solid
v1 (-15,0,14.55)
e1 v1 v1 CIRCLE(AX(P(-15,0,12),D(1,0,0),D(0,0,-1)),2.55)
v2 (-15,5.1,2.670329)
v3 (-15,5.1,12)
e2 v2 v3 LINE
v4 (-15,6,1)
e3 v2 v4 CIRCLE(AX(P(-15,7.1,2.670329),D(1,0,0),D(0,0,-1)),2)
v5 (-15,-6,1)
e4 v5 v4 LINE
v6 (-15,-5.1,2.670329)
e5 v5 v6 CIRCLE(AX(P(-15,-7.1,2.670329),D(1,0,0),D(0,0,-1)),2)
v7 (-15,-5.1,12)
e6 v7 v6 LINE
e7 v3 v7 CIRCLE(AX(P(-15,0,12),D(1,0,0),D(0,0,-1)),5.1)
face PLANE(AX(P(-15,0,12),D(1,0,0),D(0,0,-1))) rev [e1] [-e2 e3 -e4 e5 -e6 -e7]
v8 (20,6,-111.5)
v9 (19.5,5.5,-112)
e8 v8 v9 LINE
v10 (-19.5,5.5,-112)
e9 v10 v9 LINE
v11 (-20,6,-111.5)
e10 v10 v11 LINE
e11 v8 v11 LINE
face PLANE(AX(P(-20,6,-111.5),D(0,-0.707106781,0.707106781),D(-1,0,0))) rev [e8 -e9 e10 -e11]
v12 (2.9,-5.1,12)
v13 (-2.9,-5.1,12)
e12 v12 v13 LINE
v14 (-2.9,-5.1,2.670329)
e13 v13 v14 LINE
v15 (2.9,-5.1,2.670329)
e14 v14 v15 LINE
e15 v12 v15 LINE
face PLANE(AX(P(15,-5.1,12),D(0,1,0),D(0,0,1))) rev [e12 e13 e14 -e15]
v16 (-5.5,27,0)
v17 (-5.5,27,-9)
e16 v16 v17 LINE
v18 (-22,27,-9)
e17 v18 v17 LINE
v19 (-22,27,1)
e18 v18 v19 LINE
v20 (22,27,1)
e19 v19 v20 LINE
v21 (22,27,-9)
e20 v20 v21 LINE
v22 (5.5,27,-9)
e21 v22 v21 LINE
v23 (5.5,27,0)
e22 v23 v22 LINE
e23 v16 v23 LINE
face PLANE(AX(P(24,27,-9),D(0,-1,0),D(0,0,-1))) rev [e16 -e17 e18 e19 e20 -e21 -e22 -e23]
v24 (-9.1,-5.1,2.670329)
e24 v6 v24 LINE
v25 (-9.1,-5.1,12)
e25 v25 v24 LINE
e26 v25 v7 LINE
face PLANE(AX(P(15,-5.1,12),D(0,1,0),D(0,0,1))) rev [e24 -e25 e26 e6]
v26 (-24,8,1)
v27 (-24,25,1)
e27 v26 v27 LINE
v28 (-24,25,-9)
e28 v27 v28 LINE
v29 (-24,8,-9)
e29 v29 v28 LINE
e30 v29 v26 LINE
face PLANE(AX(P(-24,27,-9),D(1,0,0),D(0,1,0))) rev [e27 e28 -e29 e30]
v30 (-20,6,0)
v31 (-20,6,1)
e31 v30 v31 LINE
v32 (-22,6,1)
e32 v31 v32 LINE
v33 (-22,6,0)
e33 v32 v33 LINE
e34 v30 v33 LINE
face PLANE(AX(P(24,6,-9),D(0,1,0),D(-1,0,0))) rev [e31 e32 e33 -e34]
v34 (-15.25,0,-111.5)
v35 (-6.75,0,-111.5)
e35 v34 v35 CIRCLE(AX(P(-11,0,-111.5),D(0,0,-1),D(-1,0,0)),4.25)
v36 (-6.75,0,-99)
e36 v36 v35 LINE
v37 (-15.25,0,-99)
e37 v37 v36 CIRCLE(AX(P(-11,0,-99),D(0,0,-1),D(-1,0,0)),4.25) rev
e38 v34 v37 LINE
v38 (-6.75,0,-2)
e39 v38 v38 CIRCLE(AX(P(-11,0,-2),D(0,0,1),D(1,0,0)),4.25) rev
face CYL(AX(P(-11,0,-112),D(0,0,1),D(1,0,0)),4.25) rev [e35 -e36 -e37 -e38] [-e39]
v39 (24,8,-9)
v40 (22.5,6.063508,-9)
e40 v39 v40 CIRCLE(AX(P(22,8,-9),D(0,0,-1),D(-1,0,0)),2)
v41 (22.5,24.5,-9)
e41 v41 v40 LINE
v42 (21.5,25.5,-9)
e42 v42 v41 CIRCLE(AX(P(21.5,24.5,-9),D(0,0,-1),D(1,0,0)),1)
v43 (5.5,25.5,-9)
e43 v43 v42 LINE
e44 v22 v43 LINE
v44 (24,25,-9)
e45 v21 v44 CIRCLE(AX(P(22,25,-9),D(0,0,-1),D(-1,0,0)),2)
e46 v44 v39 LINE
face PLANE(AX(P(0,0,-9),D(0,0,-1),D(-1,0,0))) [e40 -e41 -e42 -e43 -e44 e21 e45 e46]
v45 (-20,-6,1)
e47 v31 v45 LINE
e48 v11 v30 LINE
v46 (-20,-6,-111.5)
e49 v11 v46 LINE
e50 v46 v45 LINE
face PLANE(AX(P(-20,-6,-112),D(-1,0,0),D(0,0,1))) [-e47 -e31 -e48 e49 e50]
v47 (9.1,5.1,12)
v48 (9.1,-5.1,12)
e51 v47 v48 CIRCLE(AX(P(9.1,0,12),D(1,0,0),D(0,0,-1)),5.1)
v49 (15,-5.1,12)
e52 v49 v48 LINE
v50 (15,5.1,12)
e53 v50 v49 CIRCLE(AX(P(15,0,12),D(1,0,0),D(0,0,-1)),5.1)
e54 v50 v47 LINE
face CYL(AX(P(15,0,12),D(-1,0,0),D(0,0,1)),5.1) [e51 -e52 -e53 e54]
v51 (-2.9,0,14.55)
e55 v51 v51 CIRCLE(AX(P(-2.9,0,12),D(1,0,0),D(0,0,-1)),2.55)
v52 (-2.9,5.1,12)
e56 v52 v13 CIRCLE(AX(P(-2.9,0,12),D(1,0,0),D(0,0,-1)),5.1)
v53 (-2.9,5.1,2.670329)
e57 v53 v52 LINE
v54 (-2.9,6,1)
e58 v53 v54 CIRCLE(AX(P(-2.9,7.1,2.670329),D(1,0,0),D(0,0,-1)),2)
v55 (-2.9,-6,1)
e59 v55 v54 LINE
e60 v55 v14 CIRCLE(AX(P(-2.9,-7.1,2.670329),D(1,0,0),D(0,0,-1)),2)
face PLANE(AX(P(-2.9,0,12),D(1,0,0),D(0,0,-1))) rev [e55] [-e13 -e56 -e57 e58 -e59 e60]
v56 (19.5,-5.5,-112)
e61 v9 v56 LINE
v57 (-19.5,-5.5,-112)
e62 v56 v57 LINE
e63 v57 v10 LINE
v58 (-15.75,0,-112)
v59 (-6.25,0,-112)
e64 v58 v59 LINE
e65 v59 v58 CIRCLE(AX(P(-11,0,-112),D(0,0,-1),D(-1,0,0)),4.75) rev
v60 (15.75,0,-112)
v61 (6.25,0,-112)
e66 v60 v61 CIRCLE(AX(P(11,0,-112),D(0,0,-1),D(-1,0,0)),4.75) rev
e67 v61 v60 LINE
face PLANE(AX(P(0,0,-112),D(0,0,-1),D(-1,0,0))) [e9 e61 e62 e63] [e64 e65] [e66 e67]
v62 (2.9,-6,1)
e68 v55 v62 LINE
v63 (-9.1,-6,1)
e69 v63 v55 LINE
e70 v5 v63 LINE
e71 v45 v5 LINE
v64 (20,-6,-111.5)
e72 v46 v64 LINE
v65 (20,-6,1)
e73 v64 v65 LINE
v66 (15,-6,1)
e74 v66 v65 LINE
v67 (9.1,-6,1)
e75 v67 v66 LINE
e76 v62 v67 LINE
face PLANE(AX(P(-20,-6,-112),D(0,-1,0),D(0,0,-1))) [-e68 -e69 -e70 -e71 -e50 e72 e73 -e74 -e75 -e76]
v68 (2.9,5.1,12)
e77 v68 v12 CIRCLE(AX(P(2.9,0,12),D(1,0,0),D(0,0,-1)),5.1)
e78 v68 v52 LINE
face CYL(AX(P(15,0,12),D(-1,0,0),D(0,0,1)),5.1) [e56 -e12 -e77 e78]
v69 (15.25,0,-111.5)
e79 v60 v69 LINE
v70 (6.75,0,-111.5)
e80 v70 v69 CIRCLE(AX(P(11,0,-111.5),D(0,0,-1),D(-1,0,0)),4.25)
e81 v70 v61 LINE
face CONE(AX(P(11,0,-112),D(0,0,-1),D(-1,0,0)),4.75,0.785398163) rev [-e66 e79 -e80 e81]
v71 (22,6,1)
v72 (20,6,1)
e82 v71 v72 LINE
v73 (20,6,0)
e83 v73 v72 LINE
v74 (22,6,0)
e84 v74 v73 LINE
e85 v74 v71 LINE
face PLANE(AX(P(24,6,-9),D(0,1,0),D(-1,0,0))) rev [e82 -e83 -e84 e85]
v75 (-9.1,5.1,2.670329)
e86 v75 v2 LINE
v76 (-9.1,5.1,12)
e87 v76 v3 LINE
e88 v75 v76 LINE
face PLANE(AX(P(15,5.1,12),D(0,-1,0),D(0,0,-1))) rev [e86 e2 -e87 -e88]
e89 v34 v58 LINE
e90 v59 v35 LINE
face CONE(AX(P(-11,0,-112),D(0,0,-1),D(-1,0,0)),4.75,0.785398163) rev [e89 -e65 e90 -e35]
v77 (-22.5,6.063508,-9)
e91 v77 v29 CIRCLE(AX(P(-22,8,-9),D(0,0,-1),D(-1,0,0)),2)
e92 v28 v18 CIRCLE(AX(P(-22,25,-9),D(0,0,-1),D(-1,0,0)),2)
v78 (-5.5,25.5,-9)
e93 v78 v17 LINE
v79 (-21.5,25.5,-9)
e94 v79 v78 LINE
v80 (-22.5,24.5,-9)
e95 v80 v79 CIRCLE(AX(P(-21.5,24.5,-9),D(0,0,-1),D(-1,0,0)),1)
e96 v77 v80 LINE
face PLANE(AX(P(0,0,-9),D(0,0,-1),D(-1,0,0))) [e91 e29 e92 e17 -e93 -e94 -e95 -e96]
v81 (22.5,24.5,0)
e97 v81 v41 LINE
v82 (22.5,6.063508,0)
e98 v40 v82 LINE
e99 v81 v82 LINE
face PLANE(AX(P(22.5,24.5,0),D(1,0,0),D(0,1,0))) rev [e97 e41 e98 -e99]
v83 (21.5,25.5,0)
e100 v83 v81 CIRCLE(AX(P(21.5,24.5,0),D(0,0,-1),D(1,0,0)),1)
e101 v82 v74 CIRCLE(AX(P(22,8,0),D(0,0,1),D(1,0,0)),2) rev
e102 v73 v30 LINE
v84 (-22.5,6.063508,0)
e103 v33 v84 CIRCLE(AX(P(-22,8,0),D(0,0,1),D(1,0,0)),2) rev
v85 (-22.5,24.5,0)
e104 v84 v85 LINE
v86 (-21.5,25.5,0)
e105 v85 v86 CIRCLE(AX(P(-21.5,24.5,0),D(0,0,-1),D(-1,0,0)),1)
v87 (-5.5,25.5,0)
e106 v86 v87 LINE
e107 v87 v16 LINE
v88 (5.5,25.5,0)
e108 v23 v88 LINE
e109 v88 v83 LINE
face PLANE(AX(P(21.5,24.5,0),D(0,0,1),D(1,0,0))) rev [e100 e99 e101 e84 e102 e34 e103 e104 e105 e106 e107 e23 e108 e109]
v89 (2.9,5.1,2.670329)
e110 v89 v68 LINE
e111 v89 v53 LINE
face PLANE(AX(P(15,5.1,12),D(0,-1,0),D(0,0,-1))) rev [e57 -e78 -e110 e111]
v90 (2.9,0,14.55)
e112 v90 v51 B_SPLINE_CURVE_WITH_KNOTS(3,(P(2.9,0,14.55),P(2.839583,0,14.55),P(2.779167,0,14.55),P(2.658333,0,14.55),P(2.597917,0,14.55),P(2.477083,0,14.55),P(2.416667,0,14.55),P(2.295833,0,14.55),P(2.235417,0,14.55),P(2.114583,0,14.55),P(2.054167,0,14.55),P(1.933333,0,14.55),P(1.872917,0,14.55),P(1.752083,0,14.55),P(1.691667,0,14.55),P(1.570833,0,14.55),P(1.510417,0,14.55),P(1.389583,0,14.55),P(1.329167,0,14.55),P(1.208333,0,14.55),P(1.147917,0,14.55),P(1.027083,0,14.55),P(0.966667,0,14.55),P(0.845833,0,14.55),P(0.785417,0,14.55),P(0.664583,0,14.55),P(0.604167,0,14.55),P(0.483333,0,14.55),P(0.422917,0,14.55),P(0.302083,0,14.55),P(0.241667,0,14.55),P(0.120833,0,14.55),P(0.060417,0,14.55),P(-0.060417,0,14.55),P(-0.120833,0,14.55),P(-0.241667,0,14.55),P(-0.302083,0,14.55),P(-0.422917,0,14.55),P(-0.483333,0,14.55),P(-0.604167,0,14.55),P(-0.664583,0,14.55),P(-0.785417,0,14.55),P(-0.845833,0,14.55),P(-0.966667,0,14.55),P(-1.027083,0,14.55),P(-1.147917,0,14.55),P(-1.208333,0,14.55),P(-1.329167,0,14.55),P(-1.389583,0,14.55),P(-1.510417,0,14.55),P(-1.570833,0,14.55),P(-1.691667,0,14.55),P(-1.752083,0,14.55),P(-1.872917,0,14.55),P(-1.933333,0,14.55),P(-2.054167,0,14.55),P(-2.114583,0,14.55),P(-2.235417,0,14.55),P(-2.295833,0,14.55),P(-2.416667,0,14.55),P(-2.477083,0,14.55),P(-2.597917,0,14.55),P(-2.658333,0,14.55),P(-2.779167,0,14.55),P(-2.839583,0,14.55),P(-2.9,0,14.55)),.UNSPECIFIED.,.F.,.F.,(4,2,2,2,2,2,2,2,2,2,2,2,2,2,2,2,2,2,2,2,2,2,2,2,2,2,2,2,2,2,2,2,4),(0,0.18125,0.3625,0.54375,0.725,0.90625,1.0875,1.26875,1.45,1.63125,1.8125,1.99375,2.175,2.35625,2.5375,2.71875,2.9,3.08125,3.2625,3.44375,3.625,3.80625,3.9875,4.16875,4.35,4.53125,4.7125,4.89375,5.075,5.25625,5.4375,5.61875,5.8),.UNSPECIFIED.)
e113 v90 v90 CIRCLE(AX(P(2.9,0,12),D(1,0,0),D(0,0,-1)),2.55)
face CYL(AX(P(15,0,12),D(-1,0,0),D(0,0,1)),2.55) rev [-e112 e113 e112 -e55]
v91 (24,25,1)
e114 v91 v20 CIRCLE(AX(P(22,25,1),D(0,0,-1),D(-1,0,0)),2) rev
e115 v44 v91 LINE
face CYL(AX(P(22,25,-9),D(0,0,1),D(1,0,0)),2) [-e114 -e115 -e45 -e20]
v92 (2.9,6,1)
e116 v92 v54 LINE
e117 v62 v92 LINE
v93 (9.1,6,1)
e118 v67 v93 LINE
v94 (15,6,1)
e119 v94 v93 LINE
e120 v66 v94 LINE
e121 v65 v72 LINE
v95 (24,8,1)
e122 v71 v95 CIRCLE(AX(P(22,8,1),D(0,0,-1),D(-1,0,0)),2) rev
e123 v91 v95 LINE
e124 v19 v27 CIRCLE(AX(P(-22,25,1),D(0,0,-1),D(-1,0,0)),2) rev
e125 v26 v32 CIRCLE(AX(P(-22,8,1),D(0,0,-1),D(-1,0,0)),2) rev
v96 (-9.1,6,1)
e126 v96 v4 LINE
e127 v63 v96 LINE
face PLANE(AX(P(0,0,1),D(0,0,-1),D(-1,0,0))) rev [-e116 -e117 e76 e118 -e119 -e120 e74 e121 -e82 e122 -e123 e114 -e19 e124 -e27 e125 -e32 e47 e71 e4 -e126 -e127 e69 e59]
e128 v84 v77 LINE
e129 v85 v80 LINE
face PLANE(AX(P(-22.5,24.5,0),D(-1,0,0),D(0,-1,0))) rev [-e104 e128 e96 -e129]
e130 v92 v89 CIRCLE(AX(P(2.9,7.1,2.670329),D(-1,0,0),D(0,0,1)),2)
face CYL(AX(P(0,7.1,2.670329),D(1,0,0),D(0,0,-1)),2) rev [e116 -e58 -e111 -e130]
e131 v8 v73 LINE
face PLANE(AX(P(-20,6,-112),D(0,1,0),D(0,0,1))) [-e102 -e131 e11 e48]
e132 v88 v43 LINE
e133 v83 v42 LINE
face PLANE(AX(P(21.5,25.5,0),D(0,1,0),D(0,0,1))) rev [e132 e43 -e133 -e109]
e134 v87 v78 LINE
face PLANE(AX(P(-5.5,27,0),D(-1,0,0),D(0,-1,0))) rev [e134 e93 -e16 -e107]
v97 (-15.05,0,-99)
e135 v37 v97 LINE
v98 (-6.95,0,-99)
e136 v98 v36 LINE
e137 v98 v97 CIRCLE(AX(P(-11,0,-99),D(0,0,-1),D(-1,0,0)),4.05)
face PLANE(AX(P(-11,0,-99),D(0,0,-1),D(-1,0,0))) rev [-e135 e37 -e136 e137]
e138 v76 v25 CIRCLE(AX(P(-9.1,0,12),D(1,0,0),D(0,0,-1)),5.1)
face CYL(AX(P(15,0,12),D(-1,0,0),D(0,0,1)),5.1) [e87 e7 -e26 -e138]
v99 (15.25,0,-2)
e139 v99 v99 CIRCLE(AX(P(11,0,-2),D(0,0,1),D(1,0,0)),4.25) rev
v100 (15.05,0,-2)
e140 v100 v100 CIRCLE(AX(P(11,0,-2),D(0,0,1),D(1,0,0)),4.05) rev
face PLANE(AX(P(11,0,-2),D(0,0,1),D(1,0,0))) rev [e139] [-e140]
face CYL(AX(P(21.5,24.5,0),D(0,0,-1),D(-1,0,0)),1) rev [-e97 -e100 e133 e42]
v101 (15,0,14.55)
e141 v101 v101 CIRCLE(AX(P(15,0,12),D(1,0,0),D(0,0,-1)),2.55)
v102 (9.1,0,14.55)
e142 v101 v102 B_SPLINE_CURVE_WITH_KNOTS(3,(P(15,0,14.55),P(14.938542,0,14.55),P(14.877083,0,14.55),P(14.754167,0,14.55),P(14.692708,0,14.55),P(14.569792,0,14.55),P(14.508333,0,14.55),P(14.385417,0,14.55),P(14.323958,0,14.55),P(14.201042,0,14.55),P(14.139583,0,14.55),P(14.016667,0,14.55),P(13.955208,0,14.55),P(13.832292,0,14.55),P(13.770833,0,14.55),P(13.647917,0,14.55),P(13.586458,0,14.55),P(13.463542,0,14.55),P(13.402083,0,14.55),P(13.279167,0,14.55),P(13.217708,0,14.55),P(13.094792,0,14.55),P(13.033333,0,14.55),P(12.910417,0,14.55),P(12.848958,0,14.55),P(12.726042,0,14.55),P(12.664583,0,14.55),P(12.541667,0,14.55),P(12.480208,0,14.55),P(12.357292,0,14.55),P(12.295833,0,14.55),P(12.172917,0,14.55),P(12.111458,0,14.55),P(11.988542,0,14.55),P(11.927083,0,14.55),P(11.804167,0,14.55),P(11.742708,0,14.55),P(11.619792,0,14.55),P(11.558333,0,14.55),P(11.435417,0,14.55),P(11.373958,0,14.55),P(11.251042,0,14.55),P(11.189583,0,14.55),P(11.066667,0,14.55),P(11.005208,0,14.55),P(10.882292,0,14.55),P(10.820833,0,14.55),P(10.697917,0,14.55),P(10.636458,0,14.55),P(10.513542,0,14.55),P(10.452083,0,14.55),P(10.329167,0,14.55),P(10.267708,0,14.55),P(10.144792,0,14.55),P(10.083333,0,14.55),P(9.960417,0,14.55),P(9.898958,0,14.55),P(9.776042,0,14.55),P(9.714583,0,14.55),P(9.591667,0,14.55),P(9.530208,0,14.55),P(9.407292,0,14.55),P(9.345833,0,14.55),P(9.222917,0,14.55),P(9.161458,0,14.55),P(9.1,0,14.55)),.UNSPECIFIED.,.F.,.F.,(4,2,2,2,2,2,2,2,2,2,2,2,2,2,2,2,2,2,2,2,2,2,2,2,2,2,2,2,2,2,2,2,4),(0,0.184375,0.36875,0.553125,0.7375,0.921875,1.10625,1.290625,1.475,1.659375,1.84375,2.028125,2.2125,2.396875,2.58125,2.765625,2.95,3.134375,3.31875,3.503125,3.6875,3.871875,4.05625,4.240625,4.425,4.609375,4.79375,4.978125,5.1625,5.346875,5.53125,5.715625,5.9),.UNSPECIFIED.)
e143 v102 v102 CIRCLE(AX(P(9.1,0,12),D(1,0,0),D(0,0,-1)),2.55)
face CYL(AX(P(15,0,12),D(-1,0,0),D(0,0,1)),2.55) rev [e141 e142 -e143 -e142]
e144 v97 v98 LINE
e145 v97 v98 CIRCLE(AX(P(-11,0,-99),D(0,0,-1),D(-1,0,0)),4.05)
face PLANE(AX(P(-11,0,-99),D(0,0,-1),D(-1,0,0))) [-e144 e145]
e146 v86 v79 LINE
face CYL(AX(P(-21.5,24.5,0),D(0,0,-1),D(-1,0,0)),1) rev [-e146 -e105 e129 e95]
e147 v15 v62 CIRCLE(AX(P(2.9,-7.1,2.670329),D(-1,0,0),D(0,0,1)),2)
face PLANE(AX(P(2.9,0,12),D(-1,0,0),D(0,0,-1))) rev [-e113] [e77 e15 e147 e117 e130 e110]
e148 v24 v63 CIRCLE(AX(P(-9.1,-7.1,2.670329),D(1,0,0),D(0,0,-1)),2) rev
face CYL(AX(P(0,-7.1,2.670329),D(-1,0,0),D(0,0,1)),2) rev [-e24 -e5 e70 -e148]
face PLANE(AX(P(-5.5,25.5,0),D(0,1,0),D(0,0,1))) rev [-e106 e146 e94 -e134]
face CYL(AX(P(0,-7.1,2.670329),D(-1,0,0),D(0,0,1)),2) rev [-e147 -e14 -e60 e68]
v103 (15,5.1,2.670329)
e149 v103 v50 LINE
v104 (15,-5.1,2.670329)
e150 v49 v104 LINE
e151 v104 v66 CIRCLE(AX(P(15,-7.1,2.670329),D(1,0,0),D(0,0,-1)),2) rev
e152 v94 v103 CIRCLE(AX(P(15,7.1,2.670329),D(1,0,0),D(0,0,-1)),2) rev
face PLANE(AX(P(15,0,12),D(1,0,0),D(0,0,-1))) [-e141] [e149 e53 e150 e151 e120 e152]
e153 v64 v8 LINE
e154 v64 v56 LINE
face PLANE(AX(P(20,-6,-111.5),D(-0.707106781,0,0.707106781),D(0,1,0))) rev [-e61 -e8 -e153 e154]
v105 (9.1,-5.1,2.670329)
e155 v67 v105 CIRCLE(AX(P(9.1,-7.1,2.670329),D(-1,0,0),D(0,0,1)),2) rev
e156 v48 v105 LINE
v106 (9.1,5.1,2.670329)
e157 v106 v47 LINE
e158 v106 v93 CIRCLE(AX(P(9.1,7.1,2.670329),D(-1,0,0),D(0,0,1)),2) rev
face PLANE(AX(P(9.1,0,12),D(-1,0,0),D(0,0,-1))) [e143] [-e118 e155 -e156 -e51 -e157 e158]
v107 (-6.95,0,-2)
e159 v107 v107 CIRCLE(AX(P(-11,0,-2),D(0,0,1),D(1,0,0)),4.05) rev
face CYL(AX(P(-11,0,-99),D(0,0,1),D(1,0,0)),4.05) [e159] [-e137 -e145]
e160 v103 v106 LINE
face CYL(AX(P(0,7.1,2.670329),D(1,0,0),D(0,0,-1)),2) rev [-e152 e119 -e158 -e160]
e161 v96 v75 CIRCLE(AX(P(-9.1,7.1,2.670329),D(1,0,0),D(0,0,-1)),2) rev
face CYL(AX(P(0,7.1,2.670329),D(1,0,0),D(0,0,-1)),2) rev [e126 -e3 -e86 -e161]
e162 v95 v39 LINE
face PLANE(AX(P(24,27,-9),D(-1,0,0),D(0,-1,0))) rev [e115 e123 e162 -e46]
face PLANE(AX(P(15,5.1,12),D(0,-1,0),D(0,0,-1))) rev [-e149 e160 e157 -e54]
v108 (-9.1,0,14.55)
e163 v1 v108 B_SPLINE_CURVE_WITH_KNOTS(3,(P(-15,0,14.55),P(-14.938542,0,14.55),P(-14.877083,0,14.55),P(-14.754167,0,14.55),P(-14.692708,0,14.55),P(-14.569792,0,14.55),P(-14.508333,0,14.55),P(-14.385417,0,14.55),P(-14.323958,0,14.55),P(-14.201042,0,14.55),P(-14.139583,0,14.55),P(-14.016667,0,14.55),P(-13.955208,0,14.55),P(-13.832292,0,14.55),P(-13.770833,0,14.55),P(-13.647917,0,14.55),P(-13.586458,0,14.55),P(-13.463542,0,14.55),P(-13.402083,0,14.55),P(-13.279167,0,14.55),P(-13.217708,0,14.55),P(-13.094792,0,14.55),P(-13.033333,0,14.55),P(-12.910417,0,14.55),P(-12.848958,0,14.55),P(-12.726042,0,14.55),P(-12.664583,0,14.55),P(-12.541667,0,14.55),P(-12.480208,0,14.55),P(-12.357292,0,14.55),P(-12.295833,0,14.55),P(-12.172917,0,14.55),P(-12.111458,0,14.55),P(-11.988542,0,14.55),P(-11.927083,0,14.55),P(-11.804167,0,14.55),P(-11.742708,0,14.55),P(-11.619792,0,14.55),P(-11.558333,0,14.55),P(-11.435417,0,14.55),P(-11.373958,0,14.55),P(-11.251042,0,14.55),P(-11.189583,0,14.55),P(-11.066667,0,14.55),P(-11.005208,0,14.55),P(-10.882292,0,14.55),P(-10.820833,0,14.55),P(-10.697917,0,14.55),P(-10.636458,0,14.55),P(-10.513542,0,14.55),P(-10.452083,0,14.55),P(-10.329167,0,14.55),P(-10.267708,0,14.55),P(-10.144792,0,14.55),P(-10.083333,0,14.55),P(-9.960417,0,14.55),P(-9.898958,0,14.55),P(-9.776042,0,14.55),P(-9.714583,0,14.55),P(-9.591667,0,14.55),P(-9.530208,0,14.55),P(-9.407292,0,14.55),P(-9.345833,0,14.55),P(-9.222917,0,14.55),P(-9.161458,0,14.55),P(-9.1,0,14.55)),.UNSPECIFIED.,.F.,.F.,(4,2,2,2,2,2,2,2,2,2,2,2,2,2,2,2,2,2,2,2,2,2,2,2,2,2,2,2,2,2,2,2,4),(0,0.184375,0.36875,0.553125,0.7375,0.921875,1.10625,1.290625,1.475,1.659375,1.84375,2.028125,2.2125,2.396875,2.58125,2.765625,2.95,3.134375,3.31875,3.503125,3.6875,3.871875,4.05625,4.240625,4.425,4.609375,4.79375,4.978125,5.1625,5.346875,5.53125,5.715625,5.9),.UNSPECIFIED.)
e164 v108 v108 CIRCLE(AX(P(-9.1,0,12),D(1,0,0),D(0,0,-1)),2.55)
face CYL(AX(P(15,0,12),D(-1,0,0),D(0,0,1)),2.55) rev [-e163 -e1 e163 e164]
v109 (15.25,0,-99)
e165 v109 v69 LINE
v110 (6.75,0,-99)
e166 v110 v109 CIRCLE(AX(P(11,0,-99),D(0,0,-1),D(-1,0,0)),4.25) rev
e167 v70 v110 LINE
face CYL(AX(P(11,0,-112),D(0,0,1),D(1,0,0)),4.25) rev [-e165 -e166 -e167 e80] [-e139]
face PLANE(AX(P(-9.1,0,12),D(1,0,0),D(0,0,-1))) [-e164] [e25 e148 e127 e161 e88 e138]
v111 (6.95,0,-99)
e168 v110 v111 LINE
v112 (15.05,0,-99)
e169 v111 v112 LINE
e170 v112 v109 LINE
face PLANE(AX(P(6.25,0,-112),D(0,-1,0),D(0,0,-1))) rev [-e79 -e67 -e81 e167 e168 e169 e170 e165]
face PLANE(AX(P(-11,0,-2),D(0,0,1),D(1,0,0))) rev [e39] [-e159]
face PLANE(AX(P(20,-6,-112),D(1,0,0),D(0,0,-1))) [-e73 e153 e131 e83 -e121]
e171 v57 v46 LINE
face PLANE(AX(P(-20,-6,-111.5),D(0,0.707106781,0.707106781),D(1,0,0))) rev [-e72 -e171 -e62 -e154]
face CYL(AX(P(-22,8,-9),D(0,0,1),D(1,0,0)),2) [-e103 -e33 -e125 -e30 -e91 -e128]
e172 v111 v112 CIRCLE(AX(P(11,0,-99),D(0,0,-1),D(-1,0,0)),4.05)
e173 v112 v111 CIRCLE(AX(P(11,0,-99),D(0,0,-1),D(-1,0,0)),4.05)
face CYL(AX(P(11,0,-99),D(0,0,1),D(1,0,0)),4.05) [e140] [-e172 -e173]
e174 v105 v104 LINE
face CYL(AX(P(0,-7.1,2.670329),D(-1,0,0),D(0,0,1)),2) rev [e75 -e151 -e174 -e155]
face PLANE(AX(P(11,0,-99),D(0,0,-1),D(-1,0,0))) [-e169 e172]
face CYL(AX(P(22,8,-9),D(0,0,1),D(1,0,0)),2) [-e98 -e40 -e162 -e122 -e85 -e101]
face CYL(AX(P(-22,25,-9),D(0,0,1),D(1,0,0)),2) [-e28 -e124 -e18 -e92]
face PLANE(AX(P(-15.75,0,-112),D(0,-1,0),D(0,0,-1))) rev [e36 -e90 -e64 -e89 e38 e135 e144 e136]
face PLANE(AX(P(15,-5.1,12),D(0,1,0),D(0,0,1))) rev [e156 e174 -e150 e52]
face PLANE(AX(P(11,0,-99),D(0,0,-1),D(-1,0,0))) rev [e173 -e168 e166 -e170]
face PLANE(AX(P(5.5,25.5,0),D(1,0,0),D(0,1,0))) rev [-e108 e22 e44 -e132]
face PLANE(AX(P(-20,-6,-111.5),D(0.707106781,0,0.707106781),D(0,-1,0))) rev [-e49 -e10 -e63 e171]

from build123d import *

# Parameters (mm, degrees)
BOSS_EXTRUDE1_DEPTH      = 1
BOSS_EXTRUDE1_DEPTH_BACK = 112
SKETCH1_W                = 40
SKETCH1_H                = 12
SKETCH1_R                = 4.25
SKETCH3_R                = 2.55
BOSS_EXTRUDE2_DEPTH      = 15
CUT_EXTRUDE1_START       = -2.9
SKETCH3_2_R              = 2.55
CUT_EXTRUDE1_DEPTH       = 6.2
BOSS_EXTRUDE3_START      = -3
SKETCH5_R                = 4.25
BOSS_EXTRUDE3_DEPTH      = 3
CHAMFER3_SIZE            = 0.5
FILLET3_R                = 2
SKETCH12_R               = 4.05
BOSS_EXTRUDE9_DEPTH      = 100
SKETCH18_W               = 48
SKETCH18_H               = 21
BOSS_EXTRUDE11_DEPTH     = 10
FILLET10_R               = 2
CUT_EXTRUDE8_DEPTH       = 9
BOSS_EXTRUDE12_DEPTH     = 13


with BuildPart() as part:
    # Sketch1 → Boss-Extrude1 (new, two sides: drawn at the far end of the back side and taken through both)
    with BuildSketch(Plane.XY.offset(-BOSS_EXTRUDE1_DEPTH_BACK)):
        Rectangle(SKETCH1_W, SKETCH1_H)
        with Locations((11, 0)):
            Circle(SKETCH1_R, mode=Mode.SUBTRACT)
        with Locations(Location((-11, 0, 0), (0, 0, 180))):
            Circle(SKETCH1_R, mode=Mode.SUBTRACT)
    extrude(amount=BOSS_EXTRUDE1_DEPTH + BOSS_EXTRUDE1_DEPTH_BACK)

    # Sketch3 → Boss-Extrude2 (add, symmetric)
    with BuildSketch(Plane(origin=(0, 0, 0), x_dir=(0, 0, -1), z_dir=(1, 0, 0))):
        with BuildLine():
            Line((-12, -5.1), (-1, -5.1))
            Line((-1, -5.1), (-1, 5.1))
            Line((-1, 5.1), (-12, 5.1))
            ThreePointArc((-12, 5.1), (-17.1, 0), (-12, -5.1))
        make_face()
        with Locations((-12, 0)):
            Circle(SKETCH3_R, mode=Mode.SUBTRACT)
    extrude(amount=BOSS_EXTRUDE2_DEPTH, both=True)

    # Sketch3<2> → Cut-Extrude1 (cut)
    with BuildSketch(Plane(origin=(0, 0, 0), x_dir=(0, 0, -1), z_dir=(1, 0, 0)).offset(CUT_EXTRUDE1_START)):
        with BuildLine():
            Line((-12, -5.1), (-1, -5.1))
            Line((-1, -5.1), (-1, 5.1))
            Line((-1, 5.1), (-12, 5.1))
            ThreePointArc((-12, 5.1), (-17.1, 0), (-12, -5.1))
        make_face()
        with Locations((-12, 0)):
            Circle(SKETCH3_2_R, mode=Mode.SUBTRACT)
    cut_extrude1 = extrude(amount=-CUT_EXTRUDE1_DEPTH, mode=Mode.SUBTRACT)

    # Mirror1: Cut-Extrude1 across plane
    add(cut_extrude1.mirror(Plane(origin=(0, 0, 0), x_dir=(0, 0, 1), z_dir=(1, 0, 0))), mode=Mode.SUBTRACT)

    # Sketch5 → Boss-Extrude3 (add)
    with BuildSketch(Plane.XY.offset(1).offset(BOSS_EXTRUDE3_START)):
        with Locations((-11, 0)):
            Circle(SKETCH5_R)
        with Locations((11, 0)):
            Circle(SKETCH5_R)
    extrude(amount=BOSS_EXTRUDE3_DEPTH)

    # Chamfer3
    chamfer3_edges = [part.edges().sort_by_distance(p)[0] for p in [
        (6.75, 0, -112),
        (-20, 0, -112),
        (-6.75, 0, -112),
        (0, -6, -112),
        (20, 0, -112),
        (0, 6, -112),
    ]]
    chamfer(chamfer3_edges, length=CHAMFER3_SIZE)

    # Fillet3
    # the kernel refuses this fillet: 2 mm, written as the material it adds along each edge
    with BuildSketch(Plane(origin=(9.1, -5.1, 1), x_dir=(0, -1.0, 1.5367953823073576e-12), z_dir=(1, 0, 0)), Plane(origin=(-15, -5.1, 1), x_dir=(0, -1.0, 1.5367953823073576e-12), z_dir=(1, 0, 0))) as fillet3_piece_1:
        with BuildLine():
            CenterArc((2, -1.670329309), FILLET3_R, 123.367012969, 56.632987031)
            Line((0, -1.670329309), (-0.04, -1.670329309))
            Line((-0.04, -1.670329309), (-0.04, 0))
            Line((-0.04, 0), (0, 0.04))
            ThreePointArc((0, 0.04), (0.45, 0.04), (0.878, 0.033406586))
            Line((0.878, 0.033406586), (0.9, 0))
        make_face()
    extrude(amount=5.9)
    with BuildSketch(Plane(origin=(9.1, 5.1, 1), x_dir=(0, 1.0, 1.5343282200304168e-12), z_dir=(1, 0, 0)), Plane(origin=(-15, 5.1, 1), x_dir=(0, 1.0, 1.5340815038027225e-12), z_dir=(1, 0, 0))) as fillet3_piece_2:
        with BuildLine():
            CenterArc((2, 1.670329309), FILLET3_R, 180, 56.632987031)
            Line((0, 1.670329309), (-0.04, 1.670329309))
            Line((-0.04, 1.670329309), (-0.04, 0))
            Line((-0.04, 0), (0, -0.04))
            ThreePointArc((0, -0.04), (0.45, -0.04), (0.878, -0.033406586))
            Line((0.878, -0.033406586), (0.9, 0))
        make_face()
    extrude(amount=5.9)
    with BuildSketch(Plane(origin=(-2.9, 5.1, 1), x_dir=(0, 1.0, 1.5343282200304168e-12), z_dir=(1, 0, 0))) as fillet3_piece_3:
        with BuildLine():
            CenterArc((2, 1.670329309), FILLET3_R, 180, 56.632987031)
            Line((0, 1.670329309), (-0.04, 1.670329309))
            Line((-0.04, 1.670329309), (-0.04, 0))
            Line((-0.04, 0), (0, -0.04))
            ThreePointArc((0, -0.04), (0.45, -0.04), (0.878, -0.033406586))
            Line((0.878, -0.033406586), (0.9, 0))
        make_face()
    extrude(amount=5.8)
    with BuildSketch(Plane(origin=(-2.9, -5.1, 1), x_dir=(0, -1.0, 1.5367953823073576e-12), z_dir=(1, 0, 0))) as fillet3_piece_4:
        with BuildLine():
            CenterArc((2, -1.670329309), FILLET3_R, 123.367012969, 56.632987031)
            Line((0, -1.670329309), (-0.04, -1.670329309))
            Line((-0.04, -1.670329309), (-0.04, 0))
            Line((-0.04, 0), (0, 0.04))
            ThreePointArc((0, 0.04), (0.45, 0.04), (0.878, 0.033406586))
            Line((0.878, 0.033406586), (0.9, 0))
        make_face()
    extrude(amount=5.8)

    # Sketch12 → Boss-Extrude9 (add)
    with BuildSketch(Plane(origin=(0, 0, 1), x_dir=(-1, 0, 0), z_dir=(0, 0, -1))):
        with Locations(Location((11, 0, 0), (0, 0, 180))):
            Circle(SKETCH12_R)
        with Locations(Location((-11, 0, 0), (0, 0, 180))):
            Circle(SKETCH12_R)
    extrude(amount=BOSS_EXTRUDE9_DEPTH)

    # Sketch18 → Boss-Extrude11 (add)
    with BuildSketch(Plane(origin=(0, 0, 1), x_dir=(-1, 0, 0), z_dir=(0, 0, -1))):
        with Locations((0, 16.5)):
            Rectangle(SKETCH18_W, SKETCH18_H)
    extrude(amount=BOSS_EXTRUDE11_DEPTH)

    # Fillet10
    fillet10_edges = [part.edges().sort_by_distance(p)[0] for p in [
        (-24, 6, -4),
        (-24, 27, -4),
        (24, 27, -4),
        (24, 6, -4),
    ]]
    fillet(fillet10_edges, radius=FILLET10_R)

    # Sketch20 → Cut-Extrude8 (cut)
    with BuildSketch(Plane(origin=(0, 0, -9), x_dir=(-1, 0, 0), z_dir=(0, 0, -1))):
        with BuildLine():
            Line((-22.5, 24.5), (-22.5, 6))
            Line((-22.5, 6), (22.5, 6))
            Line((22.5, 6), (22.5, 24.5))
            ThreePointArc((22.5, 24.5), (22.207106781, 25.207106781), (21.5, 25.5))
            Line((21.5, 25.5), (5.5, 25.5))
            Line((5.5, 25.5), (5.5, 27))
            Line((5.5, 27), (-5.5, 27))
            Line((-5.5, 27), (-5.5, 25.5))
            Line((-5.5, 25.5), (-21.5, 25.5))
            ThreePointArc((-21.5, 25.5), (-22.207106781, 25.207106781), (-22.5, 24.5))
        make_face()
    extrude(amount=-CUT_EXTRUDE8_DEPTH, mode=Mode.SUBTRACT)

    # Sketch22 → Boss-Extrude12 (add)
    with BuildSketch(Plane(origin=(0, 0, -99), x_dir=(-1, 0, 0), z_dir=(0, 0, -1))):
        with BuildLine():
            Line((15.75, 0), (6.25, 0))
            ThreePointArc((6.25, 0), (11, -4.75), (15.75, 0))
        make_face()
        with BuildLine():
            Line((-6.25, 0), (-15.75, 0))
            ThreePointArc((-15.75, 0), (-11, -4.75), (-6.25, 0))
        make_face()
    extrude(amount=BOSS_EXTRUDE12_DEPTH)


solid = part.part
